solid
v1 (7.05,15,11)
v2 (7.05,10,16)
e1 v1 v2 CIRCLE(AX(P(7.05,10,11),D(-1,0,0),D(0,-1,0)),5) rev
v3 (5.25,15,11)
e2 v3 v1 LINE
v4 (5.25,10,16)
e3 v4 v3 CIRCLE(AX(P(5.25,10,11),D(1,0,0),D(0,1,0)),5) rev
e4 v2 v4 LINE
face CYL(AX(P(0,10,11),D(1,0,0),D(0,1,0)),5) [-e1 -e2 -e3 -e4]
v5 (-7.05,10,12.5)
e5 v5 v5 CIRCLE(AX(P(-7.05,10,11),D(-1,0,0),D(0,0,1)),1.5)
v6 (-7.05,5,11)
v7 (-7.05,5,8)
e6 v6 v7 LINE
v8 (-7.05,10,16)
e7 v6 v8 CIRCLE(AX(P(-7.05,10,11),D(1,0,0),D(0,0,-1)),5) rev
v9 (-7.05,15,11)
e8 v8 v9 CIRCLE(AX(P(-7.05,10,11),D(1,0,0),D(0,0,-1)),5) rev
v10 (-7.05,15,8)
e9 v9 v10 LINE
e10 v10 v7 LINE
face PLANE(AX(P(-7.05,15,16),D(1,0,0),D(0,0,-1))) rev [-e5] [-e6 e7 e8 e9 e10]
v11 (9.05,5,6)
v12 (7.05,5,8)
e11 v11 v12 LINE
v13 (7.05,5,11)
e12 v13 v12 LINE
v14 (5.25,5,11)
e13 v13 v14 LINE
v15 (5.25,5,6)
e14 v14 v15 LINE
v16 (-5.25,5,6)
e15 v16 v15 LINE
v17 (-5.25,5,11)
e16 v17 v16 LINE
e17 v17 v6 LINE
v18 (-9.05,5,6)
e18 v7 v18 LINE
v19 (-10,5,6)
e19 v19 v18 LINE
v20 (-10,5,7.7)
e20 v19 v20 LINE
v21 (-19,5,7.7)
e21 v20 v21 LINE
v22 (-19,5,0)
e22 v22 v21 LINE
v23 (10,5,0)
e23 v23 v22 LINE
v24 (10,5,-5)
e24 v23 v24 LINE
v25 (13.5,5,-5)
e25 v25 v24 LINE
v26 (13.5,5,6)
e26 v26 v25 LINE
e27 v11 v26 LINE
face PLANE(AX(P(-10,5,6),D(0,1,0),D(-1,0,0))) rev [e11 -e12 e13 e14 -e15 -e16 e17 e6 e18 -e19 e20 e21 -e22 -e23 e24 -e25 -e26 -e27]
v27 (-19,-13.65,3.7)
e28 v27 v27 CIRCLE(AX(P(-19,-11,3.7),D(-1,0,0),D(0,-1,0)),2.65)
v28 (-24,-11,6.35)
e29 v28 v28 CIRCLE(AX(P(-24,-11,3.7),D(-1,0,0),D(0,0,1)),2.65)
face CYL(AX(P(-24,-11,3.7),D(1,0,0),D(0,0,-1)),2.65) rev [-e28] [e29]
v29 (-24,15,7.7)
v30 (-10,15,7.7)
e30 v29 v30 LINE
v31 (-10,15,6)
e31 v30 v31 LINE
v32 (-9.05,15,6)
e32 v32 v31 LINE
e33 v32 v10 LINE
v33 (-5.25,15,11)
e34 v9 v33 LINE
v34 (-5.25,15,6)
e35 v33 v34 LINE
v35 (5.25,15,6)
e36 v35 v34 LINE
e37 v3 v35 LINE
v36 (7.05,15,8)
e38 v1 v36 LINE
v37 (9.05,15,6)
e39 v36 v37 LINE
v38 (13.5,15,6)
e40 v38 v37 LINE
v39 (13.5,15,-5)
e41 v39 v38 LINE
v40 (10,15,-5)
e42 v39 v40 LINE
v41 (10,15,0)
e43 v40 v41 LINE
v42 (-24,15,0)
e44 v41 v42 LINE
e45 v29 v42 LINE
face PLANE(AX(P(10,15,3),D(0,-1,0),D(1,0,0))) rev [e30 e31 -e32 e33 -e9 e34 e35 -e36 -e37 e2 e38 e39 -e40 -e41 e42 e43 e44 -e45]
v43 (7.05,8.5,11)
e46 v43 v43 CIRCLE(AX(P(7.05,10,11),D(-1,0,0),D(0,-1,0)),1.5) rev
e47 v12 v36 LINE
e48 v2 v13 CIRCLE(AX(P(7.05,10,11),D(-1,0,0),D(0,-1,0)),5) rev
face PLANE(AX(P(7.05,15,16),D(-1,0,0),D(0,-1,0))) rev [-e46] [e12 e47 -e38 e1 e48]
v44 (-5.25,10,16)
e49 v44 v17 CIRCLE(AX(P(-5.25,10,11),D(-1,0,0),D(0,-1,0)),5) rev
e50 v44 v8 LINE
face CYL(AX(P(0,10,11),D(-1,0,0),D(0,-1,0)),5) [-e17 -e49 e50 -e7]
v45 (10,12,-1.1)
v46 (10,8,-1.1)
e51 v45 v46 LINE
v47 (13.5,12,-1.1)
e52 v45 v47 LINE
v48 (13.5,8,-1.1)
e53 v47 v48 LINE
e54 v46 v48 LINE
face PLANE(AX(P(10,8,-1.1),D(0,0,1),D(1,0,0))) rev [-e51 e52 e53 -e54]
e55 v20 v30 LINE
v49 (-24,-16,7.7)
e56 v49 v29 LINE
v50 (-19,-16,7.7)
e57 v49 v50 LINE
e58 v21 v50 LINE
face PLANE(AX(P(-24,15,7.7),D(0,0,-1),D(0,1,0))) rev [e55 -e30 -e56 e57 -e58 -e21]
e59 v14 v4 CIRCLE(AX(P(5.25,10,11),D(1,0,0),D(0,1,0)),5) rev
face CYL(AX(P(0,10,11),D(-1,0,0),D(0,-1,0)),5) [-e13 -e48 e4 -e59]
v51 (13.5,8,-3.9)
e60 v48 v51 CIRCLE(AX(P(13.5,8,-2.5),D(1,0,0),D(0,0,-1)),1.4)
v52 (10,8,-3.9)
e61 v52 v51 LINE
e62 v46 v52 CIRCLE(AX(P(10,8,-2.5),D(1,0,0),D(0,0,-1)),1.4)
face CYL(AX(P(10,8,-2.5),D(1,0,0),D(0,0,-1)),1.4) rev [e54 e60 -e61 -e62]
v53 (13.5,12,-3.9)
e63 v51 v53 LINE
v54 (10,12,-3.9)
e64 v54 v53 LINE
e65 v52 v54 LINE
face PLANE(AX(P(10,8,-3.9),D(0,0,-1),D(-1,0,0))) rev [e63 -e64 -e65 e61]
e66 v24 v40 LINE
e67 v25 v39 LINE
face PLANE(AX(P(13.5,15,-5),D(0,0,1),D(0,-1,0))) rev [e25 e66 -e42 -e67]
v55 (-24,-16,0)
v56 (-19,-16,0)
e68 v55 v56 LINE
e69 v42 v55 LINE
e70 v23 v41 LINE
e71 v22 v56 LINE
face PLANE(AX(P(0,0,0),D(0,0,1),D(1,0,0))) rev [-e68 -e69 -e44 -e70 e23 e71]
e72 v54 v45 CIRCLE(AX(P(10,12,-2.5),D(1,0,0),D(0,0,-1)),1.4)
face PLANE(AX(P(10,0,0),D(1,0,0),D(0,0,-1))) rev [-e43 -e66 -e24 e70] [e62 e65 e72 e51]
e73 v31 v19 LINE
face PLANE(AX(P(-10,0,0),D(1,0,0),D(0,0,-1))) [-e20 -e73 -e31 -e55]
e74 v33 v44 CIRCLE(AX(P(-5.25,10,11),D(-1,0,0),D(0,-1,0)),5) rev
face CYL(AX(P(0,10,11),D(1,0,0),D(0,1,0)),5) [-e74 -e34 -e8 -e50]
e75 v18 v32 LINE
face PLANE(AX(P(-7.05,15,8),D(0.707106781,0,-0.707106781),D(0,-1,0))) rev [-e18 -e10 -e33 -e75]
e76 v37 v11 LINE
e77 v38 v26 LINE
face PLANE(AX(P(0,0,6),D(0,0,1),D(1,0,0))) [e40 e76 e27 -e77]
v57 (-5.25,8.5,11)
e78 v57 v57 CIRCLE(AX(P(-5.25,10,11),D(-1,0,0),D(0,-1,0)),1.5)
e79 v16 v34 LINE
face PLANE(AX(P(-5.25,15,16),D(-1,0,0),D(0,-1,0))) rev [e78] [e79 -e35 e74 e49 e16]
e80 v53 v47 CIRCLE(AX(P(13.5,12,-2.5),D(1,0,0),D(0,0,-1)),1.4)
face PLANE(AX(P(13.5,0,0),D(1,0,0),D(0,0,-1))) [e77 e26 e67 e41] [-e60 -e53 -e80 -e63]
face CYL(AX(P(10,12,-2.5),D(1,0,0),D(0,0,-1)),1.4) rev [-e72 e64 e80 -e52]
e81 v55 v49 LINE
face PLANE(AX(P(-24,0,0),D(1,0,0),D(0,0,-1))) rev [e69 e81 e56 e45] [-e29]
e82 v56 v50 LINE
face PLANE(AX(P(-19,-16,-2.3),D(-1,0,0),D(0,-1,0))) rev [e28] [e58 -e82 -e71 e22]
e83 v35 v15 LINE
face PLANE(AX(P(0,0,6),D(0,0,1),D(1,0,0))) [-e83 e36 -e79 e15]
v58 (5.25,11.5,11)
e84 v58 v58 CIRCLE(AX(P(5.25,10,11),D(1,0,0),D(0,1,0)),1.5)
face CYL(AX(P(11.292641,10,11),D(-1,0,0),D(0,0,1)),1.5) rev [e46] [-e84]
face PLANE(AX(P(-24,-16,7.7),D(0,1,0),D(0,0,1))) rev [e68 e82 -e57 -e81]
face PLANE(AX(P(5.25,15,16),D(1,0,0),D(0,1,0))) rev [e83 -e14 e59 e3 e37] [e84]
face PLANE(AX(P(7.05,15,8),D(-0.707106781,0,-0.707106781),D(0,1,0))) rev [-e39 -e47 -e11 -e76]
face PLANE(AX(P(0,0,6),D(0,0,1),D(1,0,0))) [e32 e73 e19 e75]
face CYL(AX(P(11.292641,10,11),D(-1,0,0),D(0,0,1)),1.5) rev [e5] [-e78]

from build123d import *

# Parameters (mm, degrees)
SKETCH1_W           = 20
SKETCH1_H           = 30
SKETCH1_R           = 2.65
BOSS_EXTRUDE1_DEPTH = 3
SKETCH2_W           = 20
SKETCH2_H           = 10
BOSS_EXTRUDE2_DEPTH = 3
SKETCH3_W           = 1.8
SKETCH3_H           = 10
BOSS_EXTRUDE3_DEPTH = 10
FILLET1_R           = 5
CUT_EXTRUDE1_REACH  = 29.78
SKETCH4_R           = 1.5
CHAMFER1_SIZE       = 2
SKETCH5_W           = 20
SKETCH5_H           = 20
CUT_EXTRUDE2_DEPTH  = 10
SKETCH6_W           = 11
SKETCH6_H           = 10
BOSS_EXTRUDE4_DEPTH = 3.5
CUT_EXTRUDE3_DEPTH  = 3.5
SKETCH8_W           = 7.7
SKETCH8_H           = 31
SKETCH8_R           = 2.65
BOSS_EXTRUDE5_DEPTH = 14
SKETCH9_W           = 9
SKETCH9_H           = 21
CUT_EXTRUDE4_DEPTH  = 10


with BuildPart() as part:
    # Sketch1 → Boss-Extrude1 (new body)
    with BuildSketch(Plane.XY):
        Rectangle(SKETCH1_W, SKETCH1_H)
        with Locations((0, -10)):
            Circle(SKETCH1_R, mode=Mode.SUBTRACT)
        Circle(SKETCH1_R, mode=Mode.SUBTRACT)
    extrude(amount=BOSS_EXTRUDE1_DEPTH)

    # Sketch2 → Boss-Extrude2 (add)
    with BuildSketch(Plane.XY.offset(3)):
        with Locations((0, 10)):
            Rectangle(SKETCH2_W, SKETCH2_H)
    extrude(amount=BOSS_EXTRUDE2_DEPTH)

    # Sketch3 → Boss-Extrude3 (add)
    with BuildSketch(Plane.XY.offset(6)):
        with Locations((-6.15, 10)):
            Rectangle(SKETCH3_W, SKETCH3_H)
        with Locations((6.15, 10)):
            Rectangle(SKETCH3_W, SKETCH3_H)
    extrude(amount=BOSS_EXTRUDE3_DEPTH)

    # Fillet1
    fillet1_edges = [part.edges().sort_by_distance(p)[0] for p in [
        (6.15, 5, 16),
        (-6.15, 5, 16),
        (6.15, 15, 16),
        (-6.15, 15, 16),
    ]]
    fillet(fillet1_edges, radius=FILLET1_R - 0.0001)  # a hair under: the kernel refuses the full size

    # Cut-Extrude1: up to this face of the body (flat: up to its plane)
    cut_extrude1_end = Plane(part.part.faces().sort_by_distance((7.05, 10, 10.533268934))[0])
    # Sketch4 → Cut-Extrude1 (cut, up to the picked face)
    with BuildSketch(Plane.ZY.offset(7.05), mode=Mode.PRIVATE) as cut_extrude1_sk1:
        with Locations(Location((11, 10, 0), (0, 0, 270))):
            Circle(SKETCH4_R)
    cut_extrude1_tool1 = split(extrude(cut_extrude1_sk1.sketch, amount=-CUT_EXTRUDE1_REACH, mode=Mode.PRIVATE), bisect_by=cut_extrude1_end, keep=Keep.BOTH, mode=Mode.PRIVATE)
    add(cut_extrude1_tool1.solids().sort_by(Axis((-7.05, 10, 11), (1, 0, 0)))[0], mode=Mode.SUBTRACT)

    # Chamfer1
    chamfer1_edges = [part.edges().sort_by_distance(p)[0] for p in [
        (-7.05, 10, 6),
        (7.05, 10, 6),
    ]]
    chamfer(chamfer1_edges, length=CHAMFER1_SIZE)

    # Sketch5 → Cut-Extrude2 (cut)
    with BuildSketch(Plane.XY.offset(3)):
        with Locations((0, -5)):
            Rectangle(SKETCH5_W, SKETCH5_H)
    extrude(amount=-CUT_EXTRUDE2_DEPTH, mode=Mode.SUBTRACT)

    # Sketch6 → Boss-Extrude4 (add)
    with BuildSketch(Plane(origin=(10, 0, 0), x_dir=(0, 0, -1), z_dir=(1, 0, 0))):
        with Locations((-0.5, 10)):
            Rectangle(SKETCH6_W, SKETCH6_H)
    extrude(amount=BOSS_EXTRUDE4_DEPTH)

    # Sketch7 → Cut-Extrude3 (cut)
    with BuildSketch(Plane(origin=(13.5, 0, 0), x_dir=(0, 0, -1), z_dir=(1, 0, 0))):
        with BuildLine():
            Line((1.1, 8), (1.1, 12))
            ThreePointArc((1.1, 12), (2.5, 13.4), (3.9, 12))
            Line((3.9, 12), (3.9, 8))
            ThreePointArc((3.9, 8), (2.5, 6.6), (1.1, 8))
        make_face()
    extrude(amount=-CUT_EXTRUDE3_DEPTH, mode=Mode.SUBTRACT)

    # Sketch8 → Boss-Extrude5 (add)
    with BuildSketch(Plane.ZY.offset(10)):
        with Locations((3.85, -0.5)):
            Rectangle(SKETCH8_W, SKETCH8_H)
        with Locations((3.7, -11)):
            Circle(SKETCH8_R, mode=Mode.SUBTRACT)
    extrude(amount=BOSS_EXTRUDE5_DEPTH)

    # Sketch9 → Cut-Extrude4 (cut)
    with BuildSketch(Plane.XY.offset(7.7)):
        with Locations((-14.5, -5.5)):
            Rectangle(SKETCH9_W, SKETCH9_H)
    extrude(amount=-CUT_EXTRUDE4_DEPTH, mode=Mode.SUBTRACT)


solid = part.part
